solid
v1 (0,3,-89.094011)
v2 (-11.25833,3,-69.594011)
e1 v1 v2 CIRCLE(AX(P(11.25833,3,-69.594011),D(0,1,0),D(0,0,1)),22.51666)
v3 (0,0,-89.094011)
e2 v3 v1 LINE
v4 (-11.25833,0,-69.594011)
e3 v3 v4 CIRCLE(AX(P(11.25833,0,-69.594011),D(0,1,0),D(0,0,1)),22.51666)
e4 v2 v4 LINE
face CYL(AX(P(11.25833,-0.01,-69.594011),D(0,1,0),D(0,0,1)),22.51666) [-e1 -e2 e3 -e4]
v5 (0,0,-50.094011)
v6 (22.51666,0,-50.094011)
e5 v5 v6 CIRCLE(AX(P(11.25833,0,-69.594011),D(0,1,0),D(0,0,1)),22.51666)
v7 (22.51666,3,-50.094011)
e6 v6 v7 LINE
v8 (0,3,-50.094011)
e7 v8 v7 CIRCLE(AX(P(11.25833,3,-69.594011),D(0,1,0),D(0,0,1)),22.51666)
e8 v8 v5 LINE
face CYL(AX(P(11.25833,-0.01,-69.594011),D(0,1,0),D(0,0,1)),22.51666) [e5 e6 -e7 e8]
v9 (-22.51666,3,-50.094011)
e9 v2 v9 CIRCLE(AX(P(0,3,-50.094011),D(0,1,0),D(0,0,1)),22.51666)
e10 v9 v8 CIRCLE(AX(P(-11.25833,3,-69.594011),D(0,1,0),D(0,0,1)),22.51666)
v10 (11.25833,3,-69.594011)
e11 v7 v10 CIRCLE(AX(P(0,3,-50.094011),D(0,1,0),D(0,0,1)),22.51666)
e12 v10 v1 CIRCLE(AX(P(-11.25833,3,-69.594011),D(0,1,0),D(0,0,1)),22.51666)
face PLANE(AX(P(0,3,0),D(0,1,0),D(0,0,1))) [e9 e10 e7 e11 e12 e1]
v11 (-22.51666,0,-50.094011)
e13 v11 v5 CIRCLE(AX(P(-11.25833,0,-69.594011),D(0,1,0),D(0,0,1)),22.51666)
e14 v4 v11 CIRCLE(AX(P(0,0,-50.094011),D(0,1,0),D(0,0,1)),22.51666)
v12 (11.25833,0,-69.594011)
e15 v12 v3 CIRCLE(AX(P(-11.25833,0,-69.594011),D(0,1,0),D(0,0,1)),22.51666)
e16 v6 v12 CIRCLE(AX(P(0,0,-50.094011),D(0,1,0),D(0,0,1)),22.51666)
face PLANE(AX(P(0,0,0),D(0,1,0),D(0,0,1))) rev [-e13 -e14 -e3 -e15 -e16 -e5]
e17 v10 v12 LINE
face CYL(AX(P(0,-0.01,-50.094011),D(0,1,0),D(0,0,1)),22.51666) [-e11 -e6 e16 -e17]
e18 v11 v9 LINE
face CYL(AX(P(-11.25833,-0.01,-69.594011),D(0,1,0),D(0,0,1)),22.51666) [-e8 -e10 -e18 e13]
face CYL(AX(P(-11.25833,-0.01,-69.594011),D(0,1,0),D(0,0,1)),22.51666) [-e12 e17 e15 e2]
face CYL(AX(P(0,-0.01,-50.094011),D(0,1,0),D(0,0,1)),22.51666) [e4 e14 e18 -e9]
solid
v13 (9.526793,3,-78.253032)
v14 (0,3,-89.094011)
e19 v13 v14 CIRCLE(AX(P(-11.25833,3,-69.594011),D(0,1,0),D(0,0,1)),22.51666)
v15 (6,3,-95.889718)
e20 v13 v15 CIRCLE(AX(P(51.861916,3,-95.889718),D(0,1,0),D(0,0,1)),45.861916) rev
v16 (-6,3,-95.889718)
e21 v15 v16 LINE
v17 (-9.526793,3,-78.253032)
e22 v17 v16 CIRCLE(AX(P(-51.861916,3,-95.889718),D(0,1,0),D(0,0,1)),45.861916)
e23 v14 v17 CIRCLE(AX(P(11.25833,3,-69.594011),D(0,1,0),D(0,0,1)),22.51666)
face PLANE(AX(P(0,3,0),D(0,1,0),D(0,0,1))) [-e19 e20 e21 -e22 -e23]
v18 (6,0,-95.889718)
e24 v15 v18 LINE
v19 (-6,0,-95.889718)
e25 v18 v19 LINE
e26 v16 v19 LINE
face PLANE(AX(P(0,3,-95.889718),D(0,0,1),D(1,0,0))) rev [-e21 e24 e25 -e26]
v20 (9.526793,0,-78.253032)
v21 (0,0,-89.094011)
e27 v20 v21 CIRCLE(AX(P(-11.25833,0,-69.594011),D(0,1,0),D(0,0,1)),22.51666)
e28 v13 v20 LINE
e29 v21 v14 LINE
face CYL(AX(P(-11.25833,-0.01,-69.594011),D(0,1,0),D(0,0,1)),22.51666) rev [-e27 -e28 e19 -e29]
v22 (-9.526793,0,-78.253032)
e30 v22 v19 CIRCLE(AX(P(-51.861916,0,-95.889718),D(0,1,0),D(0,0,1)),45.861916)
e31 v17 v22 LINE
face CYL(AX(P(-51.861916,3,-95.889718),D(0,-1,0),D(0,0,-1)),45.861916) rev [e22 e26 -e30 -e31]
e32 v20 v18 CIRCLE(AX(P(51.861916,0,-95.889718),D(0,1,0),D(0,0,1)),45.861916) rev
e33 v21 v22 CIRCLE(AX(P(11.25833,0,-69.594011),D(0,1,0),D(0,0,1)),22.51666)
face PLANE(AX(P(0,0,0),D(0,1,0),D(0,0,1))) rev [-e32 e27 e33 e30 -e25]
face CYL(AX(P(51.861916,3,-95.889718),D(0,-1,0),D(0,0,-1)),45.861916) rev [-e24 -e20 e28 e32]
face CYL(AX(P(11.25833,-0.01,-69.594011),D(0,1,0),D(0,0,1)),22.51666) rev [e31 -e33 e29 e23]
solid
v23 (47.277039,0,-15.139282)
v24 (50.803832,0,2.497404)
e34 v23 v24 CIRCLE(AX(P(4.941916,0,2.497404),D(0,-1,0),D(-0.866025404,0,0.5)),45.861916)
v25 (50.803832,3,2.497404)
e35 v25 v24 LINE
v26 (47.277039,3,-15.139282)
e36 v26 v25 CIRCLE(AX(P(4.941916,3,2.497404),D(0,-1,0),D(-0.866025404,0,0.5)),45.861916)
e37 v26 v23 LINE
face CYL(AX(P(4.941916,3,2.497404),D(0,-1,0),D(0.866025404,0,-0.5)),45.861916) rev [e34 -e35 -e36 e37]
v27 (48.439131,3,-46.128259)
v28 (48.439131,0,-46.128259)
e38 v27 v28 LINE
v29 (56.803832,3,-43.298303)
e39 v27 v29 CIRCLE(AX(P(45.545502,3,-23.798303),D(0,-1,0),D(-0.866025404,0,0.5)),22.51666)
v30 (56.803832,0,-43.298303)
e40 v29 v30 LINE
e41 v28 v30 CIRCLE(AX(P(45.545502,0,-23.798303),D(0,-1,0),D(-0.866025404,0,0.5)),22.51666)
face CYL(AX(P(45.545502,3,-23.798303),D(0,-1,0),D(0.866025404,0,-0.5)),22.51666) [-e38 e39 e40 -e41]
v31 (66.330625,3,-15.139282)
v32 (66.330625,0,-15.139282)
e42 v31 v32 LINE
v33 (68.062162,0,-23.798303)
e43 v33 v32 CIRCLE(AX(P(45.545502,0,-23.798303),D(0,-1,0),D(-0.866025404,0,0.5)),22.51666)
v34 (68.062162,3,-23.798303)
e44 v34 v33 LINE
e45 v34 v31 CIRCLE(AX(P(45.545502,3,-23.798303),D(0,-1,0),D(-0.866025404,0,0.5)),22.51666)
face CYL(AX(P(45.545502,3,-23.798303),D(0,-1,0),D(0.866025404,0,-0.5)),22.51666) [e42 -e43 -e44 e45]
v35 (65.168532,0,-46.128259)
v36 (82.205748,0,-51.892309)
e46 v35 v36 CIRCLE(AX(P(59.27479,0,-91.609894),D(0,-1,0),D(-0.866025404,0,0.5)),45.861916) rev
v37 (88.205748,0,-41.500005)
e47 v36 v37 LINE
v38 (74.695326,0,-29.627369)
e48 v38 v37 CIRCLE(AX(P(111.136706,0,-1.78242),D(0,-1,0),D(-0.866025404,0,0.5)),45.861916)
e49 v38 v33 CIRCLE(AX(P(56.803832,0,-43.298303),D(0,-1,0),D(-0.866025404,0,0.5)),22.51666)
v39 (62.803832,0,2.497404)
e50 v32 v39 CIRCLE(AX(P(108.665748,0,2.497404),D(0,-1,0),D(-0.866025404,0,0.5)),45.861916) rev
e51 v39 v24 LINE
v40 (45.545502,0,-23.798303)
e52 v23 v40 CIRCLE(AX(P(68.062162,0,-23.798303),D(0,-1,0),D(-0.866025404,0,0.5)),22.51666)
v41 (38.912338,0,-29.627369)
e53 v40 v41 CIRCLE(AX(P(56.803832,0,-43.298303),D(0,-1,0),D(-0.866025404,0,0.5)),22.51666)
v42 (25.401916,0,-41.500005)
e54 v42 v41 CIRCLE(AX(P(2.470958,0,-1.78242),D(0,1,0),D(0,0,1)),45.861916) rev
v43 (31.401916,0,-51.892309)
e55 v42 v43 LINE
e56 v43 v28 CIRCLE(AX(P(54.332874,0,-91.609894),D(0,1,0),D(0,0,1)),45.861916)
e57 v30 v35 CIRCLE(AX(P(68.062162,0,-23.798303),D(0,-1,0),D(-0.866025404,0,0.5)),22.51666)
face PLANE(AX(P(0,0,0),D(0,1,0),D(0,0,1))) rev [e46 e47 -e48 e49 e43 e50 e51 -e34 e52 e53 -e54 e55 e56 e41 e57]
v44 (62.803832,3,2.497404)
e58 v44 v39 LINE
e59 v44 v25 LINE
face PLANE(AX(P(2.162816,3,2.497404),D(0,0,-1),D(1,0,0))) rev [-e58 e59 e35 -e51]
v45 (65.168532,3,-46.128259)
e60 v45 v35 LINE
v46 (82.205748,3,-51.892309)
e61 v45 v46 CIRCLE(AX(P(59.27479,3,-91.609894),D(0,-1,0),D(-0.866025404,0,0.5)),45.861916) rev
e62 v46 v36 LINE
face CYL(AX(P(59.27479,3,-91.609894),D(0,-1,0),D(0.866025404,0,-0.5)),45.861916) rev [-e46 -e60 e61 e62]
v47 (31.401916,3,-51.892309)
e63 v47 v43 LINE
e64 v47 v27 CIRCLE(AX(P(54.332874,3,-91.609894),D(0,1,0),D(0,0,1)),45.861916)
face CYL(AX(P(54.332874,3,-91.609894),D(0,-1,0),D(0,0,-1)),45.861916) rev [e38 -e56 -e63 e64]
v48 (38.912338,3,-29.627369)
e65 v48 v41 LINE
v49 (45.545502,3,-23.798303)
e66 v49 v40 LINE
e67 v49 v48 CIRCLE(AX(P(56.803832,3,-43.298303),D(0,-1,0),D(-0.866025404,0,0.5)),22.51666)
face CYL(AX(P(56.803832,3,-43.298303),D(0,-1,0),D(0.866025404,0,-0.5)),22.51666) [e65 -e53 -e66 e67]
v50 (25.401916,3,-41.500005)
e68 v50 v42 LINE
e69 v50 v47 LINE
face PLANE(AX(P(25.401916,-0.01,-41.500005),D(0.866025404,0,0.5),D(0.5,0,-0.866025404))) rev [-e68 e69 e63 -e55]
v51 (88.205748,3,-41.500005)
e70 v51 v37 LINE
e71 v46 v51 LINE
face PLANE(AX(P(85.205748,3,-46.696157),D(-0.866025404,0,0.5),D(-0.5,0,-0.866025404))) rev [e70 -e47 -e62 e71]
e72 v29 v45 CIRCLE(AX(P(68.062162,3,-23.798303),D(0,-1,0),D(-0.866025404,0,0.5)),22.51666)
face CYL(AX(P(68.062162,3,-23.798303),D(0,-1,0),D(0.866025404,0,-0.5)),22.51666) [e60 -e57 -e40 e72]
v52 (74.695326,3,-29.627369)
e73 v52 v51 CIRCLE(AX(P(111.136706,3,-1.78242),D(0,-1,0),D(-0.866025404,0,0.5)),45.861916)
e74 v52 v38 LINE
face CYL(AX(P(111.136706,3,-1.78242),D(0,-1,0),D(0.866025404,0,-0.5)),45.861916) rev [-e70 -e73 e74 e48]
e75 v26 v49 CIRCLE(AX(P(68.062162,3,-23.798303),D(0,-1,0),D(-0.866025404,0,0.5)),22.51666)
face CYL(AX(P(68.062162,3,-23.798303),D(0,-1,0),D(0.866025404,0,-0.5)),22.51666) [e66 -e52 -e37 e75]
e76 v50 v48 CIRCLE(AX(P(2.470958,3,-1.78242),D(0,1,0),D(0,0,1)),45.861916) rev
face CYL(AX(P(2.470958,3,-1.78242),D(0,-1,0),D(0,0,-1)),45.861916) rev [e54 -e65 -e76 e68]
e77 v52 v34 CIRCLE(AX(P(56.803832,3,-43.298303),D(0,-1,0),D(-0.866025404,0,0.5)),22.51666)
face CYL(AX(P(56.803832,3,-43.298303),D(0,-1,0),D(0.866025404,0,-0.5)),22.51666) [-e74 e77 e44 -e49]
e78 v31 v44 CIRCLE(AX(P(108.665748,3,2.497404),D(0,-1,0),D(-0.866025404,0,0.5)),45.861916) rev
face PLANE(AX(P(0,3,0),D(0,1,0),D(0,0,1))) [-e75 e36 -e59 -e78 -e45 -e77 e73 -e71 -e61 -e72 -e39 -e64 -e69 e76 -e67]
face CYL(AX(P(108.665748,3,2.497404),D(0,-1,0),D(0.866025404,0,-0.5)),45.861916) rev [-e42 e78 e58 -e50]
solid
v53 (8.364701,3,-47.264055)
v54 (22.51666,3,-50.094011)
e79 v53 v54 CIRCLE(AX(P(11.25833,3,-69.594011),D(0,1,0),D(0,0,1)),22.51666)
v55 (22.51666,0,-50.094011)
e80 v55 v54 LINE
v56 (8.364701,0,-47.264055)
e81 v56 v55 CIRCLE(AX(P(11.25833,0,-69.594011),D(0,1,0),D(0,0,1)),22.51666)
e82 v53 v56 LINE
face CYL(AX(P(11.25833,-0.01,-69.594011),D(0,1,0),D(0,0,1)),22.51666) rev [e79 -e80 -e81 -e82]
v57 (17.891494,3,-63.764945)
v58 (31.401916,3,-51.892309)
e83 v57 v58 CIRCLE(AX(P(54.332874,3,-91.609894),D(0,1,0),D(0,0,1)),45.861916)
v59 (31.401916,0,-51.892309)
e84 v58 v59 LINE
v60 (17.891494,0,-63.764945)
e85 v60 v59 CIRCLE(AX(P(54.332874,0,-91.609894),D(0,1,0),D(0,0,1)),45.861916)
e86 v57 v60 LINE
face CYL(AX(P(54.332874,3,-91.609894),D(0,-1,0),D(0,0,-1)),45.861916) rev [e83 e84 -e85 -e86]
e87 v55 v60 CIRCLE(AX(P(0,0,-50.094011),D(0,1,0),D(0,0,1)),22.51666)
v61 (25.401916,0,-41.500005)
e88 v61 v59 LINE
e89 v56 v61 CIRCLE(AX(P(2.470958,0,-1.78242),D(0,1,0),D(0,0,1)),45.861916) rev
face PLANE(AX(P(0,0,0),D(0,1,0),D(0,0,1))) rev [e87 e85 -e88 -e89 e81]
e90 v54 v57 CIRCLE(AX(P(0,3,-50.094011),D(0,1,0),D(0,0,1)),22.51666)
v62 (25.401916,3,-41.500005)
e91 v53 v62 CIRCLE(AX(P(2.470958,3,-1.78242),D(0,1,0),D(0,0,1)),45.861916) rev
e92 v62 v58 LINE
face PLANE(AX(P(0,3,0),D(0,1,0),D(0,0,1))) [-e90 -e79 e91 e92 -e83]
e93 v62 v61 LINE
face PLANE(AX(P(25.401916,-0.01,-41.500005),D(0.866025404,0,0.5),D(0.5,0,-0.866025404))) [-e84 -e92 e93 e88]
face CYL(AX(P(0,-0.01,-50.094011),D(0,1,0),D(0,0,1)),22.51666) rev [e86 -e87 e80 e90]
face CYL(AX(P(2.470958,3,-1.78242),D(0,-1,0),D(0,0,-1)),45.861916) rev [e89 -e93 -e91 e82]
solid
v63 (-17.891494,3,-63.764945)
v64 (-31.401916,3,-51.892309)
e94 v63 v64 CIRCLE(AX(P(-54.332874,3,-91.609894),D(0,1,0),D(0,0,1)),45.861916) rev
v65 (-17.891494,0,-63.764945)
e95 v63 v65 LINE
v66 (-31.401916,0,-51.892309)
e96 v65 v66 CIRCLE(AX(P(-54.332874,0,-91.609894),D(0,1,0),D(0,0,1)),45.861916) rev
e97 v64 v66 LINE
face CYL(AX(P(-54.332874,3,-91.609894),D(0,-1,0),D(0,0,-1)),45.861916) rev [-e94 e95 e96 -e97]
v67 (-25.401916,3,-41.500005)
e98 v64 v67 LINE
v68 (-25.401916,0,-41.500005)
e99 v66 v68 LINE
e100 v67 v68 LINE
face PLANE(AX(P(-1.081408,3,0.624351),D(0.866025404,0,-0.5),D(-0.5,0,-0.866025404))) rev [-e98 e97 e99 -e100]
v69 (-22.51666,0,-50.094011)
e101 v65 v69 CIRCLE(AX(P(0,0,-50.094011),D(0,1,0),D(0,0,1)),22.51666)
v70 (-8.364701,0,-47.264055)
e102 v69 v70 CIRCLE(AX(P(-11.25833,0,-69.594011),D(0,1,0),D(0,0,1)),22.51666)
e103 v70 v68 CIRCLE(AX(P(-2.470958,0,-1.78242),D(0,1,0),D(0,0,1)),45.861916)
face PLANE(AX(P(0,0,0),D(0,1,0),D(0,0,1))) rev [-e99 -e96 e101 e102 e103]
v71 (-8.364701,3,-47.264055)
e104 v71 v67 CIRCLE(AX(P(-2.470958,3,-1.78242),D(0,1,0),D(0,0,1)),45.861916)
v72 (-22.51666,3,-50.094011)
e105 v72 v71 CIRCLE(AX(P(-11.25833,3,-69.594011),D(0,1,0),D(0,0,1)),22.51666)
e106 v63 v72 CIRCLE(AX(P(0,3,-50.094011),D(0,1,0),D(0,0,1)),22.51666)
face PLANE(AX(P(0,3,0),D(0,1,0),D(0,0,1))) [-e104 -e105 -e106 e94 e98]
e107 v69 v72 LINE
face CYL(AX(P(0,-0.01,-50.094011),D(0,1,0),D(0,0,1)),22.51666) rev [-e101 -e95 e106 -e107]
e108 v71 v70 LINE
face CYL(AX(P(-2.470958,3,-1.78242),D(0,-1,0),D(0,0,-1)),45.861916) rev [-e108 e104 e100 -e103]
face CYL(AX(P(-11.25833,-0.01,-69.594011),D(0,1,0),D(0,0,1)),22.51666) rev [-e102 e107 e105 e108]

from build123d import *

# Parameters (mm, degrees)
BOSS_EXTRUDE1_DEPTH = 3
SPLIT1_DEPTH        = 3
SPLIT1_2_DEPTH      = 3
SPLIT1_3_DEPTH      = 3
SPLIT1_4_DEPTH      = 3
SPLIT1_5_DEPTH      = 3


# Read off the part's stored shape, not the designer's step: Split1
with BuildPart() as part:
    # Sketch3 → Boss-Extrude1 (new body)
    with BuildSketch(Plane(origin=(0, 0, 0), x_dir=(1, 0, 0), z_dir=(0, 1, 0))):
        with BuildLine():
            ThreePointArc((-11.258330249, 69.594010768), (-14.863463971, 67.007834664), (-17.891493772, 63.764945286))
            ThreePointArc((-17.891493772, 63.764945286), (-24.058982438, 57.159830807), (-31.401915905, 51.892309397))
            Line((-31.401915905, 51.892309397), (-25.401915905, 41.500004551))
            ThreePointArc((-25.401915905, 41.500004551), (-17.168641815, 45.225410767), (-8.364700549, 47.26405539))
            ThreePointArc((-8.364700549, 47.26405539), (-4.042261066, 48.264961433), (0, 50.094010768))
            ThreePointArc((0, 50.094010768), (4.042261066, 48.264961433), (8.364700549, 47.26405539))
            ThreePointArc((8.364700549, 47.26405539), (17.168641815, 45.225410767), (25.401915905, 41.500004551))
            Line((25.401915905, 41.500004551), (31.401915905, 51.892309397))
            ThreePointArc((31.401915905, 51.892309397), (24.058982438, 57.159830807), (17.891493772, 63.764945286))
            ThreePointArc((17.891493772, 63.764945286), (14.863463971, 67.007834664), (11.258330249, 69.594010768))
            ThreePointArc((11.258330249, 69.594010768), (8.241669751, 80.852341017), (0, 89.094010768))
            ThreePointArc((0, 89.094010768), (-8.241669751, 80.852341017), (-11.258330249, 69.594010768))
        make_face()
        with BuildLine():
            ThreePointArc((-6, 95.889718354), (-6.890340623, 86.896790728), (-9.526793223, 78.253031627))
            ThreePointArc((-9.526793223, 78.253031627), (-5.655493647, 84.457474738), (0, 89.094010768))
            ThreePointArc((0, 89.094010768), (5.655493647, 84.457474738), (9.526793223, 78.253031627))
            ThreePointArc((9.526793223, 78.253031627), (6.890340623, 86.896790728), (6, 95.889718354))
            Line((6, 95.889718354), (-6, 95.889718354))
        make_face()
    extrude(amount=BOSS_EXTRUDE1_DEPTH)

    # Mirror1: part across plane


with BuildPart() as part_1:
    add(part.part)
    add(part.part.mirror(Plane(origin=(1.08140783, 3, 0.624351102), x_dir=(-0.4999999999999996, 0, 0.8660254037844389), z_dir=(-0.8660254037844389, 0, -0.4999999999999996))))

    # Split1 outline → Split1 (cut)
    with BuildSketch(Plane(origin=(0, 0, 0), x_dir=(1, 0, 0), z_dir=(0, 1, 0))):
        with BuildLine():
            ThreePointArc((17.891493772, 63.764945286), (21.329049335, 57.310079951), (22.516660498, 50.094010768))
            ThreePointArc((22.516660498, 50.094010768), (15.673555688, 47.514477613), (8.364700549, 47.26405539))
            ThreePointArc((8.364700549, 47.26405539), (25.401915905, 41.500004551), (38.912338039, 29.627368662))
            ThreePointArc((38.912338039, 29.627368662), (41.94036784, 26.384479285), (45.545501561, 23.798303181))
            ThreePointArc((45.545501561, 23.798303181), (45.982628905, 19.383077742), (47.277038587, 15.139282322))
            ThreePointArc((47.277038587, 15.139282322), (49.913491188, 6.495523221), (50.803831811, -2.497404406))
            Line((50.803831811, -2.497404406), (62.803831811, -2.497404406))
            ThreePointArc((62.803831811, -2.497404406), (63.694172433, 6.495523221), (66.330625034, 15.139282322))
            ThreePointArc((66.330625034, 15.139282322), (67.625034716, 19.383077742), (68.06216206, 23.798303181))
            ThreePointArc((68.06216206, 23.798303181), (71.667295782, 26.384479285), (74.695325583, 29.627368662))
            ThreePointArc((74.695325583, 29.627368662), (80.862814248, 36.232483141), (88.205747716, 41.500004551))
            Line((88.205747716, 41.500004551), (82.205747716, 51.892309397))
            ThreePointArc((82.205747716, 51.892309397), (73.972473626, 48.166903181), (65.168532359, 46.128258558))
            ThreePointArc((65.168532359, 46.128258558), (60.846092876, 45.127352516), (56.803831811, 43.298303181))
            ThreePointArc((56.803831811, 43.298303181), (52.761570745, 45.127352516), (48.439131262, 46.128258558))
            ThreePointArc((48.439131262, 46.128258558), (31.401915905, 51.892309397), (17.891493772, 63.764945286))
        make_face()
        with BuildLine():
            ThreePointArc((0, 89.094010768), (5.655493647, 84.457474739), (9.526793223, 78.253031627))
            ThreePointArc((9.526793223, 78.253031627), (6.890340623, 86.896790728), (6, 95.889718354))
            Line((6, 95.889718354), (-6, 95.889718354))
            ThreePointArc((-6, 95.889718354), (-6.890340623, 86.896790728), (-9.526793223, 78.253031627))
            ThreePointArc((-9.526793223, 78.253031627), (-5.655493647, 84.457474739), (0, 89.094010768))
        make_face()
        with BuildLine():
            ThreePointArc((-25.401915905, 41.500004551), (-17.168641815, 45.225410767), (-8.364700549, 47.26405539))
            ThreePointArc((-8.364700549, 47.26405539), (-15.673555688, 47.514477613), (-22.516660498, 50.094010768))
            ThreePointArc((-22.516660498, 50.094010768), (-21.329049335, 57.310079951), (-17.891493772, 63.764945286))
            ThreePointArc((-17.891493772, 63.764945286), (-24.058982438, 57.159830807), (-31.401915905, 51.892309397))
            Line((-31.401915905, 51.892309397), (-25.401915905, 41.500004551))
        make_face()
    extrude(amount=SPLIT1_DEPTH, mode=Mode.SUBTRACT)


with BuildPart() as body_2:
    # Split1 2 outline → Split1 2 (new body)
    with BuildSketch(Plane(origin=(0, 0, 0), x_dir=(1, 0, 0), z_dir=(0, 1, 0))):
        with BuildLine():
            Line((31.401915905, 51.892309397), (25.401915905, 41.500004551))
            ThreePointArc((25.401915905, 41.500004551), (32.744849373, 36.232483141), (38.912338039, 29.627368662))
            ThreePointArc((38.912338039, 29.627368662), (41.94036784, 26.384479285), (45.545501561, 23.798303181))
            ThreePointArc((45.545501561, 23.798303181), (45.982628905, 19.383077742), (47.277038587, 15.139282322))
            ThreePointArc((47.277038587, 15.139282322), (49.913491188, 6.495523221), (50.803831811, -2.497404406))
            Line((50.803831811, -2.497404406), (62.803831811, -2.497404406))
            ThreePointArc((62.803831811, -2.497404406), (63.694172433, 6.495523221), (66.330625034, 15.139282322))
            ThreePointArc((66.330625034, 15.139282322), (67.625034716, 19.383077742), (68.06216206, 23.798303181))
            ThreePointArc((68.06216206, 23.798303181), (71.667295782, 26.384479285), (74.695325583, 29.627368662))
            ThreePointArc((74.695325583, 29.627368662), (80.862814248, 36.232483141), (88.205747716, 41.500004551))
            Line((88.205747716, 41.500004551), (82.205747716, 51.892309397))
            ThreePointArc((82.205747716, 51.892309397), (73.972473626, 48.166903181), (65.168532359, 46.128258558))
            ThreePointArc((65.168532359, 46.128258558), (60.846092876, 45.127352516), (56.803831811, 43.298303181))
            ThreePointArc((56.803831811, 43.298303181), (52.761570745, 45.127352516), (48.439131262, 46.128258558))
            ThreePointArc((48.439131262, 46.128258558), (39.635189996, 48.166903181), (31.401915905, 51.892309397))
        make_face()
    extrude(amount=SPLIT1_2_DEPTH)


with BuildPart() as body_3:
    # Split1 3 outline → Split1 3 (new body)
    with BuildSketch(Plane(origin=(0, 0, 0), x_dir=(1, 0, 0), z_dir=(0, 1, 0))):
        with BuildLine():
            ThreePointArc((17.891493772, 63.764945286), (21.329049335, 57.310079951), (22.516660498, 50.094010768))
            ThreePointArc((22.516660498, 50.094010768), (15.673555688, 47.514477613), (8.364700549, 47.26405539))
            ThreePointArc((8.364700549, 47.26405539), (17.168641815, 45.225410767), (25.401915905, 41.500004551))
            Line((25.401915905, 41.500004551), (31.401915905, 51.892309397))
            ThreePointArc((31.401915905, 51.892309397), (24.058982438, 57.159830807), (17.891493772, 63.764945286))
        make_face()
    extrude(amount=SPLIT1_3_DEPTH)


with BuildPart() as body_4:
    # Split1 4 outline → Split1 4 (new body)
    with BuildSketch(Plane(origin=(0, 0, 0), x_dir=(1, 0, 0), z_dir=(0, 1, 0))):
        with BuildLine():
            ThreePointArc((-9.526793223, 78.253031627), (-5.655493646, 84.457474739), (0, 89.094010768))
            ThreePointArc((0, 89.094010768), (5.655493646, 84.457474739), (9.526793223, 78.253031627))
            ThreePointArc((9.526793223, 78.253031627), (6.890340623, 86.896790728), (6, 95.889718354))
            Line((6, 95.889718354), (-6, 95.889718354))
            ThreePointArc((-6, 95.889718354), (-6.890340623, 86.896790728), (-9.526793223, 78.253031627))
        make_face()
    extrude(amount=SPLIT1_4_DEPTH)


with BuildPart() as body_5:
    # Split1 5 outline → Split1 5 (new body)
    with BuildSketch(Plane(origin=(0, 0, 0), x_dir=(1, 0, 0), z_dir=(0, 1, 0))):
        with BuildLine():
            ThreePointArc((-8.364700549, 47.26405539), (-15.673555688, 47.514477613), (-22.516660498, 50.094010768))
            ThreePointArc((-22.516660498, 50.094010768), (-21.329049335, 57.310079951), (-17.891493772, 63.764945286))
            ThreePointArc((-17.891493772, 63.764945286), (-24.058982438, 57.159830807), (-31.401915905, 51.892309397))
            Line((-31.401915905, 51.892309397), (-25.401915905, 41.500004551))
            ThreePointArc((-25.401915905, 41.500004551), (-17.168641815, 45.225410767), (-8.364700549, 47.26405539))
        make_face()
    extrude(amount=SPLIT1_5_DEPTH)


solid = Compound([part_1.part, body_2.part, body_3.part, body_4.part, body_5.part])
